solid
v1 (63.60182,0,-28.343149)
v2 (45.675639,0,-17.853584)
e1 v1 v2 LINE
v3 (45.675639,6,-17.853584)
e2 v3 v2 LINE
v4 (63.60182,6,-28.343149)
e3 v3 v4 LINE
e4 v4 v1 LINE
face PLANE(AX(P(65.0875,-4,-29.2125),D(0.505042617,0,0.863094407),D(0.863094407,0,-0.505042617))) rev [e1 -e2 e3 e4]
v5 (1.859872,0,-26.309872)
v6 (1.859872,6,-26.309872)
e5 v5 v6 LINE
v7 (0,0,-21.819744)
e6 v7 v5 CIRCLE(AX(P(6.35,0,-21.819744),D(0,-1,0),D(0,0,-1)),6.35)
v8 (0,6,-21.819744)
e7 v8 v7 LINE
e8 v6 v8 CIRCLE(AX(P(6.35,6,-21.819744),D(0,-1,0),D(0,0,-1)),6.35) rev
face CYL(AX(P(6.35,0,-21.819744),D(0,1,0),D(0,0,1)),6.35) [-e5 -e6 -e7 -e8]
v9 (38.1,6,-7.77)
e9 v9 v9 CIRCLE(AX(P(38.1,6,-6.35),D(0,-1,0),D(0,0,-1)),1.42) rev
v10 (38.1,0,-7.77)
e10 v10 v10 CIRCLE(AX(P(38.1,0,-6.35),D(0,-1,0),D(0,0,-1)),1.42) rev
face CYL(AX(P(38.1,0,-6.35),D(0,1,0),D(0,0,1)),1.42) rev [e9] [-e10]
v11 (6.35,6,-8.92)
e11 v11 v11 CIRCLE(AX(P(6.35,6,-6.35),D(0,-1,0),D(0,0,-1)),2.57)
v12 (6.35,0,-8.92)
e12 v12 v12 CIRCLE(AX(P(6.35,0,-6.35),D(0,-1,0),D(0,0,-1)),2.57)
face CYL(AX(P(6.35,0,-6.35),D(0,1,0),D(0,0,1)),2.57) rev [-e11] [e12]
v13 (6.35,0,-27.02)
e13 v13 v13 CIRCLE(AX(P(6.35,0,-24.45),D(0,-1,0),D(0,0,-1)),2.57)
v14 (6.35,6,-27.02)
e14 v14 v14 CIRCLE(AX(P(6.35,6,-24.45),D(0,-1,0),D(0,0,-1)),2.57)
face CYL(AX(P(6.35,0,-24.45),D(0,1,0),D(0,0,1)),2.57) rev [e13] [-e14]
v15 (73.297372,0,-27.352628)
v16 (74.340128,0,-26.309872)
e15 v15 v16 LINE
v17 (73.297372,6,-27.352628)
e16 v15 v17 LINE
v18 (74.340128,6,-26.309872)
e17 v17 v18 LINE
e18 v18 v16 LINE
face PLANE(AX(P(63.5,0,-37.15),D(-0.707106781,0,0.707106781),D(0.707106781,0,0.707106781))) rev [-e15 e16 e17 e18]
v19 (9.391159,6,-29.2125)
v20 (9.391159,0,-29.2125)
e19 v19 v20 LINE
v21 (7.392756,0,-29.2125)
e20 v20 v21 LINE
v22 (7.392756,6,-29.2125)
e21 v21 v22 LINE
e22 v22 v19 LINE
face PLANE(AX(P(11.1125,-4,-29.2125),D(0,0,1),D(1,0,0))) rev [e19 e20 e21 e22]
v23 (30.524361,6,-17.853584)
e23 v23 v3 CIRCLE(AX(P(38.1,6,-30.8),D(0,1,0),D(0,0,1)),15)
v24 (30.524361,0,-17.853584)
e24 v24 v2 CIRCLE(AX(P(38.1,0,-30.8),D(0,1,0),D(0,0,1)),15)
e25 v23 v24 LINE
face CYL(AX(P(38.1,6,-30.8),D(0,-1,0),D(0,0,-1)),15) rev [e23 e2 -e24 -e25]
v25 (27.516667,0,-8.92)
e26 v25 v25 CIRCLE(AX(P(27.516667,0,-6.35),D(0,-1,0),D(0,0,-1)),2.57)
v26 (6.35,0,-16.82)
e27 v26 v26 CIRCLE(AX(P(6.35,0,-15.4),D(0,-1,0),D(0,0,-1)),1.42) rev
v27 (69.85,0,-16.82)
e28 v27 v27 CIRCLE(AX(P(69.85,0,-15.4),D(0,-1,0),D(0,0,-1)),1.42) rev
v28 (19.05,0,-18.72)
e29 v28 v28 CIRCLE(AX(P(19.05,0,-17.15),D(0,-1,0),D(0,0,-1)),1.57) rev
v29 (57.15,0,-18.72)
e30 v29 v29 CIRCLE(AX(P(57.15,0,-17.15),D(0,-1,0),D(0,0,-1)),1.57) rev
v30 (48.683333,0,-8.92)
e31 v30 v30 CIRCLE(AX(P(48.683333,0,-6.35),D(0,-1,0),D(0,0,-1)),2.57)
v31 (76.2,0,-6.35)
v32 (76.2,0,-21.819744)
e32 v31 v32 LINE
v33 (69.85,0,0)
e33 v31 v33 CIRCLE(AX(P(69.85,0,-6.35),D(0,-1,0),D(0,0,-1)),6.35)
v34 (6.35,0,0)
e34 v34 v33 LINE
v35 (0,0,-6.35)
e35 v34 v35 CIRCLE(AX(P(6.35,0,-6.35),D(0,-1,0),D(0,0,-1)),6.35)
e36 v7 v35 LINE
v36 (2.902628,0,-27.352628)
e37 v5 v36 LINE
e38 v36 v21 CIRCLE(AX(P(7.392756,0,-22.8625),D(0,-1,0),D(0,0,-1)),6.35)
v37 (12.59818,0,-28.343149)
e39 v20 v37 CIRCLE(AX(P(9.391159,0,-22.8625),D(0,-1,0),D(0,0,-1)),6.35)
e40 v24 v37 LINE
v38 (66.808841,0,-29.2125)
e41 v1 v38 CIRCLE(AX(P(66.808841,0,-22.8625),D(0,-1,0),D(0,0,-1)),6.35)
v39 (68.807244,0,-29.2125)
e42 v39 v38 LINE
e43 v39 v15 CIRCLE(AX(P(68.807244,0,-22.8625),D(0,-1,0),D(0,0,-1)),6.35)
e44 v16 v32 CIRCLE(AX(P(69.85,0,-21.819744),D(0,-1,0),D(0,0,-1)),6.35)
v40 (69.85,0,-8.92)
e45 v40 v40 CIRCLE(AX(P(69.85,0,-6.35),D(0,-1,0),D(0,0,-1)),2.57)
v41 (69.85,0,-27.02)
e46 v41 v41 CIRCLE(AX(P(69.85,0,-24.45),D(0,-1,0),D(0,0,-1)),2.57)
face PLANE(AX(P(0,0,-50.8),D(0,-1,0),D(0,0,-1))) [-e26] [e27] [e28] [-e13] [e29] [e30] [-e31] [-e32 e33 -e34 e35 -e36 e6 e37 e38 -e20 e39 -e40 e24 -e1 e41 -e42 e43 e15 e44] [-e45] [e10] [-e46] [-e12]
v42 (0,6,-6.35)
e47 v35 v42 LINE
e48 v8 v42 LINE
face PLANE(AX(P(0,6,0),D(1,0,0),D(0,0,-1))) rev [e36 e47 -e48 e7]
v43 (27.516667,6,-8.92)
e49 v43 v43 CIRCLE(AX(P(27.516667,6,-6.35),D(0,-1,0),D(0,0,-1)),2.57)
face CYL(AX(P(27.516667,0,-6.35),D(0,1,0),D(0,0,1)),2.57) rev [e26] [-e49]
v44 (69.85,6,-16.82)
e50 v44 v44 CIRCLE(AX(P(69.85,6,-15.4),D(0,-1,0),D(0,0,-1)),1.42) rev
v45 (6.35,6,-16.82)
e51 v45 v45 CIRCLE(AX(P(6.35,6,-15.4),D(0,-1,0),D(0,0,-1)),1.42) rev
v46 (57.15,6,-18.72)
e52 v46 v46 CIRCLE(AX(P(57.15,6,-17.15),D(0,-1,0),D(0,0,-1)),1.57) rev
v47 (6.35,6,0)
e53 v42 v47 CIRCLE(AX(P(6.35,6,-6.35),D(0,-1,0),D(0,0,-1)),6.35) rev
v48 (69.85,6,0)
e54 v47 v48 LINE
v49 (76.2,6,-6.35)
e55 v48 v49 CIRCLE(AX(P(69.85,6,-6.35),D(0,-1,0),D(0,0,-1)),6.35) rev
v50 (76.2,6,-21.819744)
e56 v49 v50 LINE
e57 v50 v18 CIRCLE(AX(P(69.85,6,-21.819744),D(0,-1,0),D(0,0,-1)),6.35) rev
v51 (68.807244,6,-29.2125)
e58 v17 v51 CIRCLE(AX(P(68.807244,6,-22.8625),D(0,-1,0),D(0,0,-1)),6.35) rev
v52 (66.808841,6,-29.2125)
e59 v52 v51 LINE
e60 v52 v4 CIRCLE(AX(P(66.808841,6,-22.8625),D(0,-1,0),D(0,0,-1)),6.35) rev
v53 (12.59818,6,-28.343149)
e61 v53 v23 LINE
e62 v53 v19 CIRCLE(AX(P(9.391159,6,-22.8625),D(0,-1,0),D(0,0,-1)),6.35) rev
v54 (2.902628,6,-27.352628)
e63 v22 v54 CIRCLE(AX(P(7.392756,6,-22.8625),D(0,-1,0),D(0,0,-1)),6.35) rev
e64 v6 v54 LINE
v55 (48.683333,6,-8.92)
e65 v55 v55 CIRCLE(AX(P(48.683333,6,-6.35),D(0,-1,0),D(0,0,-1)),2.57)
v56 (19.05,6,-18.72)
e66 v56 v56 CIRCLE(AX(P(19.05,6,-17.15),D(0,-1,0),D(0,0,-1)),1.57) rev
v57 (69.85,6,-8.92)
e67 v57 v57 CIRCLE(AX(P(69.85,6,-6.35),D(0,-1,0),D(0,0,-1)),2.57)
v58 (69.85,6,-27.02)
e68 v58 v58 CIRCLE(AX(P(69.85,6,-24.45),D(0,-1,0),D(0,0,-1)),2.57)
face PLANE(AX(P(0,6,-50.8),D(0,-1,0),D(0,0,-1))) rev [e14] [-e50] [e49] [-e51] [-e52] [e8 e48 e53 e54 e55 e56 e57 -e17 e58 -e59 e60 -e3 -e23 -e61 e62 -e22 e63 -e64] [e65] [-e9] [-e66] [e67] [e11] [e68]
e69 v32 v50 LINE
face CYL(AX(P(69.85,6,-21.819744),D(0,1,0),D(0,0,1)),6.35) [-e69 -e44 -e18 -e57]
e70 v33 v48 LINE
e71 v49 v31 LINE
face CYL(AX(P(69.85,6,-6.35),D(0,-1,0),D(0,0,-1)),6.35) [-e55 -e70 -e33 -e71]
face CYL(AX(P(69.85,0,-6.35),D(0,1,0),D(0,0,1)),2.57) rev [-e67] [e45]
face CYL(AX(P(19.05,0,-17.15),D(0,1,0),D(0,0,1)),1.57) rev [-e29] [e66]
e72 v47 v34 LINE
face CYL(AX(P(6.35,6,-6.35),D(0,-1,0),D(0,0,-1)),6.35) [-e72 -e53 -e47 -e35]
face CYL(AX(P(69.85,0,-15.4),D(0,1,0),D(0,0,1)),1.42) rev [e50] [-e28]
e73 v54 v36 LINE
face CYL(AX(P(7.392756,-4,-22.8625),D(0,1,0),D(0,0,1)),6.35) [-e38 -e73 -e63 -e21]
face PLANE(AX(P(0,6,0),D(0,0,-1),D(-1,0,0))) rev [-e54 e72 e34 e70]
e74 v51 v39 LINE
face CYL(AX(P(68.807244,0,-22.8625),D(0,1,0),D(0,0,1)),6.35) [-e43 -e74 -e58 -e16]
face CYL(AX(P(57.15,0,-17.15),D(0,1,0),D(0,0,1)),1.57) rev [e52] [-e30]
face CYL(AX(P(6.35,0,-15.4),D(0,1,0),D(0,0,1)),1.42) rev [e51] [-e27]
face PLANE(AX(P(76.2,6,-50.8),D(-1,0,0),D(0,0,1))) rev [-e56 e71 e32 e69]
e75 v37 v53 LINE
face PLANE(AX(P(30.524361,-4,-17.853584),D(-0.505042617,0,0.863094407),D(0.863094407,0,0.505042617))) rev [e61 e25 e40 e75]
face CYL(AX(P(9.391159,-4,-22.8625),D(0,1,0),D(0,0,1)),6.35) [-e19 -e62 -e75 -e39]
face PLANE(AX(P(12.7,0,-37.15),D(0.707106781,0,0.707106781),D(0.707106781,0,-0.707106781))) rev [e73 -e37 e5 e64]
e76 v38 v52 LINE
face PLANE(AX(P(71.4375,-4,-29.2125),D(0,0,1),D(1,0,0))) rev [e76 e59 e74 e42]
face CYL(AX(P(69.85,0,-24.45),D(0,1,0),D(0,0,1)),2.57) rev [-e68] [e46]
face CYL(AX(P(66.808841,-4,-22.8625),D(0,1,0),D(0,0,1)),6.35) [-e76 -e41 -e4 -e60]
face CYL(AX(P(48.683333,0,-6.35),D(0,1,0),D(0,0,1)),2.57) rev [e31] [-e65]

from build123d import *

# Parameters (mm, degrees)
SKETCH1_R           = 15
BOSS_EXTRUDE1_DEPTH = 6
SKETCH2_R           = 1.5
CUT_EXTRUDE1_DEPTH  = 92.777339251
CUT_EXTRUDE2_DEPTH  = 92.777339251
SKETCH13_R          = 1.65
M4_TAP_DEPTH        = 85.985660555
SKETCH15_R          = 2.65
M5_THROUGH_DEPTH    = 83.615146916
FILLET1_R           = 6.35
CUT_EXTRUDE4_START  = -10
CUT_EXTRUDE4_DEPTH  = 10
FILLET2_R           = 6.35
SKETCH17_R          = 1.5
CUT_EXTRUDE5_DEPTH  = 82.827930172
MOVE_FACE1_BY       = 0.08
MOVE_FACE1_2_BY     = 0.08
MOVE_FACE1_3_BY     = 0.08
MOVE_FACE1_4_BY     = 0.08
MOVE_FACE1_5_BY     = 0.08
MOVE_FACE1_6_BY     = 0.08
MOVE_FACE1_7_BY     = 0.08
MOVE_FACE1_8_BY     = 0.08
MOVE_FACE1_9_BY     = 0.08
MOVE_FACE1_10_BY    = 0.08
MOVE_FACE1_11_BY    = 0.08


with BuildPart() as part:
    # Sketch1 → Boss-Extrude1 (new body)
    with BuildSketch(Plane(origin=(0, 0, 0), x_dir=(1, 0, 0), z_dir=(0, 1, 0))):
        Polygon((0, 0), (76.2, 0), (76.2, 50.8), (38.1, 50.8), (0, 50.8), align=None)
        with Locations(Location((38.1, 30.8, 0), (0, 0, 270))):
            Circle(SKETCH1_R, mode=Mode.SUBTRACT)
    extrude(amount=BOSS_EXTRUDE1_DEPTH)

    # Sketch2 → Cut-Extrude1 (cut, through all)
    with BuildSketch(Plane(origin=(0, 6, 0), x_dir=(1, 0, 0), z_dir=(0, 1, 0))):
        with Locations(Location((19.05, 30.8, 0), (0, 0, 270))):
            Circle(SKETCH2_R)
        with Locations(Location((57.15, 30.8, 0), (0, 0, 90))):
            Circle(SKETCH2_R)
    extrude(amount=-CUT_EXTRUDE1_DEPTH, mode=Mode.SUBTRACT)

    # Sketch9 → Cut-Extrude2 (cut, through all)
    with BuildSketch(Plane(origin=(0, 6, 0), x_dir=(1, 0, 0), z_dir=(0, 1, 0))):
        with BuildLine():
            Line((0, 50.8), (76.2, 50.8))
            Line((76.2, 50.8), (76.2, 24.45))
            Line((76.2, 24.45), (63.5, 37.15))
            Line((63.5, 37.15), (53.1, 37.15))
            Line((53.1, 37.15), (53.1, 30.8))
            ThreePointArc((53.1, 30.8), (38.1, 15.8), (23.1, 30.8))
            Line((23.1, 30.8), (23.1, 37.15))
            Line((23.1, 37.15), (12.7, 37.15))
            Line((12.7, 37.15), (0, 24.45))
            Line((0, 24.45), (0, 50.8))
        make_face()
    extrude(amount=-CUT_EXTRUDE2_DEPTH, mode=Mode.SUBTRACT)

    # Sketch13 → M4-tap (cut, through all)
    with BuildSketch(Plane(origin=(0, 6, 0), x_dir=(1, 0, 0), z_dir=(0, 1, 0))):
        with Locations(Location((19.05, 17.15, 0), (0, 0, 270))):
            Circle(SKETCH13_R)
        with Locations(Location((57.15, 17.15, 0), (0, 0, 270))):
            Circle(SKETCH13_R)
    extrude(amount=-M4_TAP_DEPTH, mode=Mode.SUBTRACT)

    # Sketch15 → M5-through (cut, through all)
    with BuildSketch(Plane(origin=(0, 6, -5.8), x_dir=(1, 0, 0), z_dir=(0, -1, 0))):
        with Locations(Location((6.35, -18.65, 0), (0, 0, 270))):
            Circle(SKETCH15_R)
        with Locations(Location((6.35, -0.55, 0), (0, 0, 270))):
            Circle(SKETCH15_R)
        with Locations(Location((27.516666667, -0.55, 0), (0, 0, 270))):
            Circle(SKETCH15_R)
        with Locations(Location((48.683333333, -0.55, 0), (0, 0, 270))):
            Circle(SKETCH15_R)
        with Locations(Location((69.85, -0.55, 0), (0, 0, 270))):
            Circle(SKETCH15_R)
        with Locations(Location((69.85, -18.65, 0), (0, 0, 270))):
            Circle(SKETCH15_R)
    extrude(amount=M5_THROUGH_DEPTH, mode=Mode.SUBTRACT)

    # Fillet1
    fillet1_edges = [part.edges().sort_by_distance(p)[0] for p in [
        (76.2, 3, 0),
        (0, 3, 0),
        (0, 3, -24.45),
        (76.2, 3, -24.45),
        (63.5, 3, -37.15),
        (53.1, 3, -37.15),
        (23.1, 3, -37.15),
        (12.7, 3, -37.15),
    ]]
    fillet(fillet1_edges, radius=FILLET1_R - 0.0001)  # a hair under: the kernel refuses the full size

    # Sketch16 → Cut-Extrude4 (cut)
    with BuildSketch(Plane(origin=(0, 6, 0), x_dir=(1, 0, 0), z_dir=(0, 1, 0)).offset(CUT_EXTRUDE4_START)):
        with BuildLine():
            Line((30.524360743, 17.853583899), (11.1125, 29.2125))
            Line((11.1125, 29.2125), (4.7625, 29.2125))
            Line((4.7625, 29.2125), (38.1, 62.55))
            Line((38.1, 62.55), (71.4375, 29.2125))
            Line((71.4375, 29.2125), (65.0875, 29.2125))
            Line((65.0875, 29.2125), (45.675639257, 17.853583899))
            ThreePointArc((45.675639257, 17.853583899), (38.1, 15.8), (30.524360743, 17.853583899))
        make_face()
    extrude(amount=CUT_EXTRUDE4_DEPTH, mode=Mode.SUBTRACT)

    # Fillet2
    fillet2_edges = [part.edges().sort_by_distance(p)[0] for p in [
        (11.1125, 3, -29.2125),
        (4.7625, 3, -29.2125),
        (71.4375, 3, -29.2125),
        (65.0875, 3, -29.2125),
    ]]
    fillet(fillet2_edges, radius=FILLET2_R)

    # Sketch17 → Cut-Extrude5 (cut, through all)
    with BuildSketch(Plane(origin=(0, 6, 0), x_dir=(-1, 0, 0), z_dir=(0, 1, 0))):
        with Locations(Location((-6.35, -15.4, 0), (0, 0, 90))):
            Circle(SKETCH17_R)
        with Locations(Location((-38.1, -6.35, 0), (0, 0, 90))):
            Circle(SKETCH17_R)
        with Locations(Location((-69.85, -15.4, 0), (0, 0, 90))):
            Circle(SKETCH17_R)
    extrude(amount=-CUT_EXTRUDE5_DEPTH, mode=Mode.SUBTRACT)

    # Move Face1: a curved face moved outward by 0.08
    add(Solid.thicken(part.faces().sort_by_distance((6.35, 3, -21.8))[0], MOVE_FACE1_BY))

    # Move Face1 2: a curved face moved outward by 0.08
    add(Solid.thicken(part.faces().sort_by_distance((19.05, 3, -18.8))[0], MOVE_FACE1_2_BY))

    # Move Face1 3: a curved face moved outward by 0.08
    add(Solid.thicken(part.faces().sort_by_distance((57.15, 3, -18.8))[0], MOVE_FACE1_3_BY))

    # Move Face1 4: a curved face moved outward by 0.08
    add(Solid.thicken(part.faces().sort_by_distance((6.35, 3, -3.7))[0], MOVE_FACE1_4_BY))

    # Move Face1 5: a curved face moved outward by 0.08
    add(Solid.thicken(part.faces().sort_by_distance((27.516666667, 3, -3.7))[0], MOVE_FACE1_5_BY))

    # Move Face1 6: a curved face moved outward by 0.08
    add(Solid.thicken(part.faces().sort_by_distance((48.683333333, 3, -3.7))[0], MOVE_FACE1_6_BY))

    # Move Face1 7: a curved face moved outward by 0.08
    add(Solid.thicken(part.faces().sort_by_distance((69.85, 3, -3.7))[0], MOVE_FACE1_7_BY))

    # Move Face1 8: a curved face moved outward by 0.08
    add(Solid.thicken(part.faces().sort_by_distance((69.85, 3, -21.8))[0], MOVE_FACE1_8_BY))

    # Move Face1 9: a curved face moved outward by 0.08
    add(Solid.thicken(part.faces().sort_by_distance((6.35, 3, -16.9))[0], MOVE_FACE1_9_BY))

    # Move Face1 10: a curved face moved outward by 0.08
    add(Solid.thicken(part.faces().sort_by_distance((38.1, 3, -7.85))[0], MOVE_FACE1_10_BY))

    # Move Face1 11: a curved face moved outward by 0.08
    add(Solid.thicken(part.faces().sort_by_distance((69.85, 3, -16.9))[0], MOVE_FACE1_11_BY))


solid = part.part
